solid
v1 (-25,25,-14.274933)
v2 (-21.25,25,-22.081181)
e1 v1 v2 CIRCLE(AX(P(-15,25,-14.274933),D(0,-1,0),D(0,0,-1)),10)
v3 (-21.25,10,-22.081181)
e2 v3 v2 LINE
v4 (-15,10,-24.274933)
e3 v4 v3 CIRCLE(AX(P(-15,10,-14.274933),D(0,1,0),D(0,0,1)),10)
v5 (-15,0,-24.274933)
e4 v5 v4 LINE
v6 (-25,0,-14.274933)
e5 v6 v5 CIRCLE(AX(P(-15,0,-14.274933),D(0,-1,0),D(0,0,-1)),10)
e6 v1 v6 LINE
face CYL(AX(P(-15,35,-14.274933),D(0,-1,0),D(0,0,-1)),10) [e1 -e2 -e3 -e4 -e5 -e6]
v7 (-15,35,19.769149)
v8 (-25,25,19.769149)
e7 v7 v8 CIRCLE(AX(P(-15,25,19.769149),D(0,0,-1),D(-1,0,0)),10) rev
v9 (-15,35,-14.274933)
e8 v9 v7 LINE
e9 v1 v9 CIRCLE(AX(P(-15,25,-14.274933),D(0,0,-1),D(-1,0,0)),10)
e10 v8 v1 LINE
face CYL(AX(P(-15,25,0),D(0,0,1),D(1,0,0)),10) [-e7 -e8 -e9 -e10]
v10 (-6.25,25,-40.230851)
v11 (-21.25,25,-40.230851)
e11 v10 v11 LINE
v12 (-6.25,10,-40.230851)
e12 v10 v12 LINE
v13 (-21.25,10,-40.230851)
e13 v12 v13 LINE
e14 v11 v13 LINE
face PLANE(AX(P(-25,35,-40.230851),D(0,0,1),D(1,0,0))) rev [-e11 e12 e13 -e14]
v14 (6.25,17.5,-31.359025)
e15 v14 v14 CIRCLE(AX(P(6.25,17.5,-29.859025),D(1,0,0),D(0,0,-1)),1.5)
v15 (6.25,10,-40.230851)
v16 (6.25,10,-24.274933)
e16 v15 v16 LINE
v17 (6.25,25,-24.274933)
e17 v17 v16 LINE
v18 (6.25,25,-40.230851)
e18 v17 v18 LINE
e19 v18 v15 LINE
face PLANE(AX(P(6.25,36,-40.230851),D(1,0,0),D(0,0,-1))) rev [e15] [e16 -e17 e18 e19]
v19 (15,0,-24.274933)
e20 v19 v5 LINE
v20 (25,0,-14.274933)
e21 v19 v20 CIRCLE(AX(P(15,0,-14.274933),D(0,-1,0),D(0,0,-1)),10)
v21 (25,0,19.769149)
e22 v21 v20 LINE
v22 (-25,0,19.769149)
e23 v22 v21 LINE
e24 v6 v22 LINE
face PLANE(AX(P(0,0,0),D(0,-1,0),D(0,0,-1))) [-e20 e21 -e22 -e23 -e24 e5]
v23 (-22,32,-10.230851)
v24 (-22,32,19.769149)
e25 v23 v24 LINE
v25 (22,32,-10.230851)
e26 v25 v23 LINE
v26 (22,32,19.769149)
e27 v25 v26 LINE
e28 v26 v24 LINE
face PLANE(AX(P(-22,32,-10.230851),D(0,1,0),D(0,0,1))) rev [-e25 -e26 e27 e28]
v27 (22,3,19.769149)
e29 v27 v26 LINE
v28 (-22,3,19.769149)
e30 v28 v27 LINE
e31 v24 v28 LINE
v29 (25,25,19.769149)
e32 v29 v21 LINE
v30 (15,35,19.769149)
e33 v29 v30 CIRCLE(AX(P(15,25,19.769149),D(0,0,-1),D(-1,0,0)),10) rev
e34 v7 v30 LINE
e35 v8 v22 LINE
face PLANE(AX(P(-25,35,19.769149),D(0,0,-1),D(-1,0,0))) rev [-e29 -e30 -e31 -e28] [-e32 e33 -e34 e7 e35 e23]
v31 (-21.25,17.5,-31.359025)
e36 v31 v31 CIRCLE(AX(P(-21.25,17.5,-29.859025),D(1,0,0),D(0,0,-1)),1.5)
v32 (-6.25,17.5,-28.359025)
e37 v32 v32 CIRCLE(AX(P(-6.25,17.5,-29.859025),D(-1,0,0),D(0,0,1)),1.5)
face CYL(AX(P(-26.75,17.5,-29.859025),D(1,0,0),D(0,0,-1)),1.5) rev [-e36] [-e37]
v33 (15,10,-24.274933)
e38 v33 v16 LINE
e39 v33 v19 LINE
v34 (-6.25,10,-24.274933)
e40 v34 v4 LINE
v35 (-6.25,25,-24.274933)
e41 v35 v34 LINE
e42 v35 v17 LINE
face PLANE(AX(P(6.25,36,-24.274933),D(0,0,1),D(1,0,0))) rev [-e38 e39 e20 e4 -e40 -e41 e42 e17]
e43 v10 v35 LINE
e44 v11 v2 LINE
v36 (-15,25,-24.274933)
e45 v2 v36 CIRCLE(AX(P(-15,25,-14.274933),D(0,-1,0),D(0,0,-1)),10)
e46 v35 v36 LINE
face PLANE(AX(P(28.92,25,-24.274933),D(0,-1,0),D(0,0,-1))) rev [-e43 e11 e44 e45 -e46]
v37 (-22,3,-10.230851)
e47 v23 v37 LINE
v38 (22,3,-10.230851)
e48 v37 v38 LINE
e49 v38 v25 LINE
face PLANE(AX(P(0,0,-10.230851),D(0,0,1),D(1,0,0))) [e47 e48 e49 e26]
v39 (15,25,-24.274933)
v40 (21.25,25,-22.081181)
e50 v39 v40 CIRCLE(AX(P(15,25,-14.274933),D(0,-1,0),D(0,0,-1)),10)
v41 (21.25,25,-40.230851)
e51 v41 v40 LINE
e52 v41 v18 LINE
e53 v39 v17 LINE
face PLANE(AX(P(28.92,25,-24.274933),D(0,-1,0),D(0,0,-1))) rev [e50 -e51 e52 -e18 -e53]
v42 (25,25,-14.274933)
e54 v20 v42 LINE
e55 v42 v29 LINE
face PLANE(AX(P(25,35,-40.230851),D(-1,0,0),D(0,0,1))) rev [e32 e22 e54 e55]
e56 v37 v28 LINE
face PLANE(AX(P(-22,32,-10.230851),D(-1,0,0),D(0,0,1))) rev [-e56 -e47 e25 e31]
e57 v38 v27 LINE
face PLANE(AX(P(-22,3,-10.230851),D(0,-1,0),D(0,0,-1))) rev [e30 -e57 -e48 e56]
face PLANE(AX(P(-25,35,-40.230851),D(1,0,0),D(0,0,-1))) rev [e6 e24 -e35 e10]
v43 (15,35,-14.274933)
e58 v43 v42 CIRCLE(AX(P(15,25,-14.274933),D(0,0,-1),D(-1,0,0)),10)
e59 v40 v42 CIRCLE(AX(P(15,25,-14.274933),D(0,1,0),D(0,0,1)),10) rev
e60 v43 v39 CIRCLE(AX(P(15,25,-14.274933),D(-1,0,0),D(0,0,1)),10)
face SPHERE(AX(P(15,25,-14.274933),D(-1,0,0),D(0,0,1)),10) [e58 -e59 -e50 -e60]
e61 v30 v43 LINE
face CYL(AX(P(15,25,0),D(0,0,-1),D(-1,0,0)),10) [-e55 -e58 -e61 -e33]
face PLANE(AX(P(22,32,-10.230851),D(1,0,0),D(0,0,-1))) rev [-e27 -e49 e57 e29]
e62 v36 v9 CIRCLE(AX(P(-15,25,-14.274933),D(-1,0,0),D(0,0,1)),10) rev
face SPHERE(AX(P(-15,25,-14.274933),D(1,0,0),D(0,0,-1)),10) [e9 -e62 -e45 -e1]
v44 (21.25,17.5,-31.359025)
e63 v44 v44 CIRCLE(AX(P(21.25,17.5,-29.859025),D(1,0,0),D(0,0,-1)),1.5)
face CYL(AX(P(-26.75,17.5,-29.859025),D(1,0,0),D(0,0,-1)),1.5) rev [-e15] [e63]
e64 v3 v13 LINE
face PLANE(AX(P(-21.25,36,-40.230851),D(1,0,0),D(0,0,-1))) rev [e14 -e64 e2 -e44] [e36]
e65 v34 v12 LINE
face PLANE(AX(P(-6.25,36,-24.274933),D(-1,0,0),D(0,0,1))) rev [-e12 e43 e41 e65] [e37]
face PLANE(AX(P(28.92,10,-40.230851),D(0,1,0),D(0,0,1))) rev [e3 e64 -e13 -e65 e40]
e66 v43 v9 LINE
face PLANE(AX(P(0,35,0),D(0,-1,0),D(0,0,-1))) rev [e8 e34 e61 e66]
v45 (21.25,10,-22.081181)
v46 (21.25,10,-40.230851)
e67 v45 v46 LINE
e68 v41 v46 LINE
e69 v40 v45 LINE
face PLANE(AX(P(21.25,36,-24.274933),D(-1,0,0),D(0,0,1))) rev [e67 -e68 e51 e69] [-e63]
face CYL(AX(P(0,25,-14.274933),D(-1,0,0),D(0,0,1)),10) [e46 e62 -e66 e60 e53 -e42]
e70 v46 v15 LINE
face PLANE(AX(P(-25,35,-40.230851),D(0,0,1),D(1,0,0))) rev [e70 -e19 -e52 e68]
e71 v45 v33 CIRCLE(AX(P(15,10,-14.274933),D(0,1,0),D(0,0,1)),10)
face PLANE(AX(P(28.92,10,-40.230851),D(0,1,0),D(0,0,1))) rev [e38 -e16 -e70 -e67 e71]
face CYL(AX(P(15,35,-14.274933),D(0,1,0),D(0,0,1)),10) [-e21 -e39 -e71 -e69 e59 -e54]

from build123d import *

# Parameters (mm, degrees)
SKETCH1_W           = 50
SKETCH1_H           = 60
BOSS_EXTRUDE1_DEPTH = 35
SKETCH2_W           = 44
SKETCH2_H           = 29
CUT_EXTRUDE1_DEPTH  = 30
CUT_EXTRUDE2_DEPTH  = 36
SKETCH5_R           = 1.5
CUT_EXTRUDE3_DEPTH  = 48
CUT_EXTRUDE5_DEPTH  = 50.17
FILLET1_R           = 10
FILLET2_START       = -24.274933135
FILLET2_OUTLINE_W   = 50
FILLET2_OUTLINE_H   = 35
FILLET2_DEPTH       = 10
FILLET2_START_2     = -15.881773092
FILLET2_2_DEPTH     = 35.650922027
FILLET2_3_DEPTH     = 25
FILLET2_START_3     = 10
FILLET2_4_DEPTH     = 15
FILLET2_5_ANGLE     = 90


with BuildPart() as part:
    # Sketch1 → Boss-Extrude1 (new body)
    with BuildSketch(Plane(origin=(0, 0, 0), x_dir=(1, 0, 0), z_dir=(0, 1, 0))):
        with Locations((0, 10.230851065)):
            Rectangle(SKETCH1_W, SKETCH1_H)
    extrude(amount=BOSS_EXTRUDE1_DEPTH)

    # Sketch2 → Cut-Extrude1 (cut)
    with BuildSketch(Plane.XY.offset(19.769148935)):
        with Locations((0, 17.5)):
            Rectangle(SKETCH2_W, SKETCH2_H)
    extrude(amount=-CUT_EXTRUDE1_DEPTH, mode=Mode.SUBTRACT)

    # Sketch4 → Cut-Extrude2 (cut)
    with BuildSketch(Plane(origin=(0, 0, 0), x_dir=(-1, 0, 0), z_dir=(0, -1, 0))):
        Polygon((-25, 24.274933135), (-21.25, 24.274933135), (-21.25, 40.230851065), (-6.25, 40.230851065), (-6.25, 24.274933135), (6.25, 24.274933135), (6.25, 40.230851065), (21.25, 40.230851065), (21.25, 24.274933135), (25, 24.274933135), (38.228638219, 24.274933135), (38.228638219, 61.695696762), (-27.361816785, 61.695696762), (-27.361816785, 24.274933135), align=None)
    extrude(amount=-CUT_EXTRUDE2_DEPTH, mode=Mode.SUBTRACT)

    # Sketch5 → Cut-Extrude3 (cut)
    with BuildSketch(Plane(origin=(21.25, 0, 0), x_dir=(0, 0, -1), z_dir=(1, 0, 0))):
        with Locations((29.859024855, 17.5)):
            Circle(SKETCH5_R)
    extrude(amount=-CUT_EXTRUDE3_DEPTH, mode=Mode.SUBTRACT)

    # Sketch12 → Cut-Extrude5 (cut)
    with BuildSketch(Plane.ZY.offset(21.25)):
        Polygon((-40.230851065, 10), (-24.274933135, 10), (-24.274933135, -4.872452702), (-41.905821838, -4.872452702), (-41.905821838, 36.918280203), (-24.274933135, 36.918280203), (-24.274933135, 25), (-40.230851065, 25), align=None)
    extrude(amount=-CUT_EXTRUDE5_DEPTH, mode=Mode.SUBTRACT)

    # Fillet1
    fillet1_edges = [part.edges().sort_by_distance(p)[0] for p in [
        (0, 35, -24.274933135),
    ]]
    fillet(fillet1_edges, radius=FILLET1_R - 0.0001)  # a hair under: the kernel refuses the full size

    # Fillet2: read off the stored shape, not the designer's step
    # Fillet2 outline → Fillet2 (cut)
    with BuildSketch(Plane.XY.offset(FILLET2_START)):
        with Locations((0, 17.5)):
            Rectangle(FILLET2_OUTLINE_W, FILLET2_OUTLINE_H)
    extrude(amount=FILLET2_DEPTH, mode=Mode.SUBTRACT)

    # Fillet2 2 outline → Fillet2 2 (cut)
    with BuildSketch(Plane.XY.offset(FILLET2_START_2)):
        with BuildLine():
            Line((25, 35), (15, 35))
            ThreePointArc((15, 35), (22.071067812, 32.071067812), (25, 25))
            Line((25, 25), (25, 35))
        make_face()
        with BuildLine():
            ThreePointArc((-25, 25), (-22.071067812, 32.071067812), (-15, 35))
            Line((-15, 35), (-25, 35))
            Line((-25, 35), (-25, 25))
        make_face()
    extrude(amount=FILLET2_2_DEPTH, mode=Mode.SUBTRACT)

    # Fillet2 3 outline → Fillet2 3 (add)
    with BuildSketch(Plane(origin=(0, 0, 0), x_dir=(1, 0, 0), z_dir=(0, 1, 0))):
        with BuildLine():
            ThreePointArc((-15, 24.274933135), (-22.071067812, 21.346000947), (-25, 14.274933135))
            Line((-25, 14.274933135), (25, 14.274933135))
            ThreePointArc((25, 14.274933135), (22.071067812, 21.346000947), (15, 24.274933135))
            Line((15, 24.274933135), (-15, 24.274933135))
        make_face()
    extrude(amount=FILLET2_3_DEPTH)

    # Fillet2 4 outline → Fillet2 4 (add)
    with BuildSketch(Plane(origin=(0, 0, 0), x_dir=(1, 0, 0), z_dir=(0, 1, 0)).offset(FILLET2_START_3)):
        with BuildLine():
            Line((-21.25, 24.274933135), (-21.25, 22.081180633))
            ThreePointArc((-21.25, 22.081180633), (-18.311912214, 23.710569706), (-15, 24.274933135))
            Line((-15, 24.274933135), (-21.25, 24.274933135))
        make_face()
        with BuildLine():
            ThreePointArc((15, 24.274933135), (18.311912214, 23.710569706), (21.25, 22.081180633))
            Line((21.25, 22.081180633), (21.25, 24.274933135))
            Line((21.25, 24.274933135), (15, 24.274933135))
        make_face()
    extrude(amount=FILLET2_4_DEPTH)

    # Fillet2 5 outline → Fillet2 5 (revolve)
    with BuildSketch(Plane(origin=(0, 25, -14.274933135), x_dir=(0, 0, -1), z_dir=(0, -1, 0))):
        with BuildLine():
            Line((10, -15), (10, 15))
            ThreePointArc((10, 15), (7.071067812, 22.071067812), (0, 25))
            Line((0, 25), (0, -25))
            ThreePointArc((0, -25), (7.071067812, -22.071067812), (10, -15))
        make_face()
    revolve(axis=Axis((0, 25, -14.274933135), (1, 0, 0)), revolution_arc=FILLET2_5_ANGLE)


solid = part.part
